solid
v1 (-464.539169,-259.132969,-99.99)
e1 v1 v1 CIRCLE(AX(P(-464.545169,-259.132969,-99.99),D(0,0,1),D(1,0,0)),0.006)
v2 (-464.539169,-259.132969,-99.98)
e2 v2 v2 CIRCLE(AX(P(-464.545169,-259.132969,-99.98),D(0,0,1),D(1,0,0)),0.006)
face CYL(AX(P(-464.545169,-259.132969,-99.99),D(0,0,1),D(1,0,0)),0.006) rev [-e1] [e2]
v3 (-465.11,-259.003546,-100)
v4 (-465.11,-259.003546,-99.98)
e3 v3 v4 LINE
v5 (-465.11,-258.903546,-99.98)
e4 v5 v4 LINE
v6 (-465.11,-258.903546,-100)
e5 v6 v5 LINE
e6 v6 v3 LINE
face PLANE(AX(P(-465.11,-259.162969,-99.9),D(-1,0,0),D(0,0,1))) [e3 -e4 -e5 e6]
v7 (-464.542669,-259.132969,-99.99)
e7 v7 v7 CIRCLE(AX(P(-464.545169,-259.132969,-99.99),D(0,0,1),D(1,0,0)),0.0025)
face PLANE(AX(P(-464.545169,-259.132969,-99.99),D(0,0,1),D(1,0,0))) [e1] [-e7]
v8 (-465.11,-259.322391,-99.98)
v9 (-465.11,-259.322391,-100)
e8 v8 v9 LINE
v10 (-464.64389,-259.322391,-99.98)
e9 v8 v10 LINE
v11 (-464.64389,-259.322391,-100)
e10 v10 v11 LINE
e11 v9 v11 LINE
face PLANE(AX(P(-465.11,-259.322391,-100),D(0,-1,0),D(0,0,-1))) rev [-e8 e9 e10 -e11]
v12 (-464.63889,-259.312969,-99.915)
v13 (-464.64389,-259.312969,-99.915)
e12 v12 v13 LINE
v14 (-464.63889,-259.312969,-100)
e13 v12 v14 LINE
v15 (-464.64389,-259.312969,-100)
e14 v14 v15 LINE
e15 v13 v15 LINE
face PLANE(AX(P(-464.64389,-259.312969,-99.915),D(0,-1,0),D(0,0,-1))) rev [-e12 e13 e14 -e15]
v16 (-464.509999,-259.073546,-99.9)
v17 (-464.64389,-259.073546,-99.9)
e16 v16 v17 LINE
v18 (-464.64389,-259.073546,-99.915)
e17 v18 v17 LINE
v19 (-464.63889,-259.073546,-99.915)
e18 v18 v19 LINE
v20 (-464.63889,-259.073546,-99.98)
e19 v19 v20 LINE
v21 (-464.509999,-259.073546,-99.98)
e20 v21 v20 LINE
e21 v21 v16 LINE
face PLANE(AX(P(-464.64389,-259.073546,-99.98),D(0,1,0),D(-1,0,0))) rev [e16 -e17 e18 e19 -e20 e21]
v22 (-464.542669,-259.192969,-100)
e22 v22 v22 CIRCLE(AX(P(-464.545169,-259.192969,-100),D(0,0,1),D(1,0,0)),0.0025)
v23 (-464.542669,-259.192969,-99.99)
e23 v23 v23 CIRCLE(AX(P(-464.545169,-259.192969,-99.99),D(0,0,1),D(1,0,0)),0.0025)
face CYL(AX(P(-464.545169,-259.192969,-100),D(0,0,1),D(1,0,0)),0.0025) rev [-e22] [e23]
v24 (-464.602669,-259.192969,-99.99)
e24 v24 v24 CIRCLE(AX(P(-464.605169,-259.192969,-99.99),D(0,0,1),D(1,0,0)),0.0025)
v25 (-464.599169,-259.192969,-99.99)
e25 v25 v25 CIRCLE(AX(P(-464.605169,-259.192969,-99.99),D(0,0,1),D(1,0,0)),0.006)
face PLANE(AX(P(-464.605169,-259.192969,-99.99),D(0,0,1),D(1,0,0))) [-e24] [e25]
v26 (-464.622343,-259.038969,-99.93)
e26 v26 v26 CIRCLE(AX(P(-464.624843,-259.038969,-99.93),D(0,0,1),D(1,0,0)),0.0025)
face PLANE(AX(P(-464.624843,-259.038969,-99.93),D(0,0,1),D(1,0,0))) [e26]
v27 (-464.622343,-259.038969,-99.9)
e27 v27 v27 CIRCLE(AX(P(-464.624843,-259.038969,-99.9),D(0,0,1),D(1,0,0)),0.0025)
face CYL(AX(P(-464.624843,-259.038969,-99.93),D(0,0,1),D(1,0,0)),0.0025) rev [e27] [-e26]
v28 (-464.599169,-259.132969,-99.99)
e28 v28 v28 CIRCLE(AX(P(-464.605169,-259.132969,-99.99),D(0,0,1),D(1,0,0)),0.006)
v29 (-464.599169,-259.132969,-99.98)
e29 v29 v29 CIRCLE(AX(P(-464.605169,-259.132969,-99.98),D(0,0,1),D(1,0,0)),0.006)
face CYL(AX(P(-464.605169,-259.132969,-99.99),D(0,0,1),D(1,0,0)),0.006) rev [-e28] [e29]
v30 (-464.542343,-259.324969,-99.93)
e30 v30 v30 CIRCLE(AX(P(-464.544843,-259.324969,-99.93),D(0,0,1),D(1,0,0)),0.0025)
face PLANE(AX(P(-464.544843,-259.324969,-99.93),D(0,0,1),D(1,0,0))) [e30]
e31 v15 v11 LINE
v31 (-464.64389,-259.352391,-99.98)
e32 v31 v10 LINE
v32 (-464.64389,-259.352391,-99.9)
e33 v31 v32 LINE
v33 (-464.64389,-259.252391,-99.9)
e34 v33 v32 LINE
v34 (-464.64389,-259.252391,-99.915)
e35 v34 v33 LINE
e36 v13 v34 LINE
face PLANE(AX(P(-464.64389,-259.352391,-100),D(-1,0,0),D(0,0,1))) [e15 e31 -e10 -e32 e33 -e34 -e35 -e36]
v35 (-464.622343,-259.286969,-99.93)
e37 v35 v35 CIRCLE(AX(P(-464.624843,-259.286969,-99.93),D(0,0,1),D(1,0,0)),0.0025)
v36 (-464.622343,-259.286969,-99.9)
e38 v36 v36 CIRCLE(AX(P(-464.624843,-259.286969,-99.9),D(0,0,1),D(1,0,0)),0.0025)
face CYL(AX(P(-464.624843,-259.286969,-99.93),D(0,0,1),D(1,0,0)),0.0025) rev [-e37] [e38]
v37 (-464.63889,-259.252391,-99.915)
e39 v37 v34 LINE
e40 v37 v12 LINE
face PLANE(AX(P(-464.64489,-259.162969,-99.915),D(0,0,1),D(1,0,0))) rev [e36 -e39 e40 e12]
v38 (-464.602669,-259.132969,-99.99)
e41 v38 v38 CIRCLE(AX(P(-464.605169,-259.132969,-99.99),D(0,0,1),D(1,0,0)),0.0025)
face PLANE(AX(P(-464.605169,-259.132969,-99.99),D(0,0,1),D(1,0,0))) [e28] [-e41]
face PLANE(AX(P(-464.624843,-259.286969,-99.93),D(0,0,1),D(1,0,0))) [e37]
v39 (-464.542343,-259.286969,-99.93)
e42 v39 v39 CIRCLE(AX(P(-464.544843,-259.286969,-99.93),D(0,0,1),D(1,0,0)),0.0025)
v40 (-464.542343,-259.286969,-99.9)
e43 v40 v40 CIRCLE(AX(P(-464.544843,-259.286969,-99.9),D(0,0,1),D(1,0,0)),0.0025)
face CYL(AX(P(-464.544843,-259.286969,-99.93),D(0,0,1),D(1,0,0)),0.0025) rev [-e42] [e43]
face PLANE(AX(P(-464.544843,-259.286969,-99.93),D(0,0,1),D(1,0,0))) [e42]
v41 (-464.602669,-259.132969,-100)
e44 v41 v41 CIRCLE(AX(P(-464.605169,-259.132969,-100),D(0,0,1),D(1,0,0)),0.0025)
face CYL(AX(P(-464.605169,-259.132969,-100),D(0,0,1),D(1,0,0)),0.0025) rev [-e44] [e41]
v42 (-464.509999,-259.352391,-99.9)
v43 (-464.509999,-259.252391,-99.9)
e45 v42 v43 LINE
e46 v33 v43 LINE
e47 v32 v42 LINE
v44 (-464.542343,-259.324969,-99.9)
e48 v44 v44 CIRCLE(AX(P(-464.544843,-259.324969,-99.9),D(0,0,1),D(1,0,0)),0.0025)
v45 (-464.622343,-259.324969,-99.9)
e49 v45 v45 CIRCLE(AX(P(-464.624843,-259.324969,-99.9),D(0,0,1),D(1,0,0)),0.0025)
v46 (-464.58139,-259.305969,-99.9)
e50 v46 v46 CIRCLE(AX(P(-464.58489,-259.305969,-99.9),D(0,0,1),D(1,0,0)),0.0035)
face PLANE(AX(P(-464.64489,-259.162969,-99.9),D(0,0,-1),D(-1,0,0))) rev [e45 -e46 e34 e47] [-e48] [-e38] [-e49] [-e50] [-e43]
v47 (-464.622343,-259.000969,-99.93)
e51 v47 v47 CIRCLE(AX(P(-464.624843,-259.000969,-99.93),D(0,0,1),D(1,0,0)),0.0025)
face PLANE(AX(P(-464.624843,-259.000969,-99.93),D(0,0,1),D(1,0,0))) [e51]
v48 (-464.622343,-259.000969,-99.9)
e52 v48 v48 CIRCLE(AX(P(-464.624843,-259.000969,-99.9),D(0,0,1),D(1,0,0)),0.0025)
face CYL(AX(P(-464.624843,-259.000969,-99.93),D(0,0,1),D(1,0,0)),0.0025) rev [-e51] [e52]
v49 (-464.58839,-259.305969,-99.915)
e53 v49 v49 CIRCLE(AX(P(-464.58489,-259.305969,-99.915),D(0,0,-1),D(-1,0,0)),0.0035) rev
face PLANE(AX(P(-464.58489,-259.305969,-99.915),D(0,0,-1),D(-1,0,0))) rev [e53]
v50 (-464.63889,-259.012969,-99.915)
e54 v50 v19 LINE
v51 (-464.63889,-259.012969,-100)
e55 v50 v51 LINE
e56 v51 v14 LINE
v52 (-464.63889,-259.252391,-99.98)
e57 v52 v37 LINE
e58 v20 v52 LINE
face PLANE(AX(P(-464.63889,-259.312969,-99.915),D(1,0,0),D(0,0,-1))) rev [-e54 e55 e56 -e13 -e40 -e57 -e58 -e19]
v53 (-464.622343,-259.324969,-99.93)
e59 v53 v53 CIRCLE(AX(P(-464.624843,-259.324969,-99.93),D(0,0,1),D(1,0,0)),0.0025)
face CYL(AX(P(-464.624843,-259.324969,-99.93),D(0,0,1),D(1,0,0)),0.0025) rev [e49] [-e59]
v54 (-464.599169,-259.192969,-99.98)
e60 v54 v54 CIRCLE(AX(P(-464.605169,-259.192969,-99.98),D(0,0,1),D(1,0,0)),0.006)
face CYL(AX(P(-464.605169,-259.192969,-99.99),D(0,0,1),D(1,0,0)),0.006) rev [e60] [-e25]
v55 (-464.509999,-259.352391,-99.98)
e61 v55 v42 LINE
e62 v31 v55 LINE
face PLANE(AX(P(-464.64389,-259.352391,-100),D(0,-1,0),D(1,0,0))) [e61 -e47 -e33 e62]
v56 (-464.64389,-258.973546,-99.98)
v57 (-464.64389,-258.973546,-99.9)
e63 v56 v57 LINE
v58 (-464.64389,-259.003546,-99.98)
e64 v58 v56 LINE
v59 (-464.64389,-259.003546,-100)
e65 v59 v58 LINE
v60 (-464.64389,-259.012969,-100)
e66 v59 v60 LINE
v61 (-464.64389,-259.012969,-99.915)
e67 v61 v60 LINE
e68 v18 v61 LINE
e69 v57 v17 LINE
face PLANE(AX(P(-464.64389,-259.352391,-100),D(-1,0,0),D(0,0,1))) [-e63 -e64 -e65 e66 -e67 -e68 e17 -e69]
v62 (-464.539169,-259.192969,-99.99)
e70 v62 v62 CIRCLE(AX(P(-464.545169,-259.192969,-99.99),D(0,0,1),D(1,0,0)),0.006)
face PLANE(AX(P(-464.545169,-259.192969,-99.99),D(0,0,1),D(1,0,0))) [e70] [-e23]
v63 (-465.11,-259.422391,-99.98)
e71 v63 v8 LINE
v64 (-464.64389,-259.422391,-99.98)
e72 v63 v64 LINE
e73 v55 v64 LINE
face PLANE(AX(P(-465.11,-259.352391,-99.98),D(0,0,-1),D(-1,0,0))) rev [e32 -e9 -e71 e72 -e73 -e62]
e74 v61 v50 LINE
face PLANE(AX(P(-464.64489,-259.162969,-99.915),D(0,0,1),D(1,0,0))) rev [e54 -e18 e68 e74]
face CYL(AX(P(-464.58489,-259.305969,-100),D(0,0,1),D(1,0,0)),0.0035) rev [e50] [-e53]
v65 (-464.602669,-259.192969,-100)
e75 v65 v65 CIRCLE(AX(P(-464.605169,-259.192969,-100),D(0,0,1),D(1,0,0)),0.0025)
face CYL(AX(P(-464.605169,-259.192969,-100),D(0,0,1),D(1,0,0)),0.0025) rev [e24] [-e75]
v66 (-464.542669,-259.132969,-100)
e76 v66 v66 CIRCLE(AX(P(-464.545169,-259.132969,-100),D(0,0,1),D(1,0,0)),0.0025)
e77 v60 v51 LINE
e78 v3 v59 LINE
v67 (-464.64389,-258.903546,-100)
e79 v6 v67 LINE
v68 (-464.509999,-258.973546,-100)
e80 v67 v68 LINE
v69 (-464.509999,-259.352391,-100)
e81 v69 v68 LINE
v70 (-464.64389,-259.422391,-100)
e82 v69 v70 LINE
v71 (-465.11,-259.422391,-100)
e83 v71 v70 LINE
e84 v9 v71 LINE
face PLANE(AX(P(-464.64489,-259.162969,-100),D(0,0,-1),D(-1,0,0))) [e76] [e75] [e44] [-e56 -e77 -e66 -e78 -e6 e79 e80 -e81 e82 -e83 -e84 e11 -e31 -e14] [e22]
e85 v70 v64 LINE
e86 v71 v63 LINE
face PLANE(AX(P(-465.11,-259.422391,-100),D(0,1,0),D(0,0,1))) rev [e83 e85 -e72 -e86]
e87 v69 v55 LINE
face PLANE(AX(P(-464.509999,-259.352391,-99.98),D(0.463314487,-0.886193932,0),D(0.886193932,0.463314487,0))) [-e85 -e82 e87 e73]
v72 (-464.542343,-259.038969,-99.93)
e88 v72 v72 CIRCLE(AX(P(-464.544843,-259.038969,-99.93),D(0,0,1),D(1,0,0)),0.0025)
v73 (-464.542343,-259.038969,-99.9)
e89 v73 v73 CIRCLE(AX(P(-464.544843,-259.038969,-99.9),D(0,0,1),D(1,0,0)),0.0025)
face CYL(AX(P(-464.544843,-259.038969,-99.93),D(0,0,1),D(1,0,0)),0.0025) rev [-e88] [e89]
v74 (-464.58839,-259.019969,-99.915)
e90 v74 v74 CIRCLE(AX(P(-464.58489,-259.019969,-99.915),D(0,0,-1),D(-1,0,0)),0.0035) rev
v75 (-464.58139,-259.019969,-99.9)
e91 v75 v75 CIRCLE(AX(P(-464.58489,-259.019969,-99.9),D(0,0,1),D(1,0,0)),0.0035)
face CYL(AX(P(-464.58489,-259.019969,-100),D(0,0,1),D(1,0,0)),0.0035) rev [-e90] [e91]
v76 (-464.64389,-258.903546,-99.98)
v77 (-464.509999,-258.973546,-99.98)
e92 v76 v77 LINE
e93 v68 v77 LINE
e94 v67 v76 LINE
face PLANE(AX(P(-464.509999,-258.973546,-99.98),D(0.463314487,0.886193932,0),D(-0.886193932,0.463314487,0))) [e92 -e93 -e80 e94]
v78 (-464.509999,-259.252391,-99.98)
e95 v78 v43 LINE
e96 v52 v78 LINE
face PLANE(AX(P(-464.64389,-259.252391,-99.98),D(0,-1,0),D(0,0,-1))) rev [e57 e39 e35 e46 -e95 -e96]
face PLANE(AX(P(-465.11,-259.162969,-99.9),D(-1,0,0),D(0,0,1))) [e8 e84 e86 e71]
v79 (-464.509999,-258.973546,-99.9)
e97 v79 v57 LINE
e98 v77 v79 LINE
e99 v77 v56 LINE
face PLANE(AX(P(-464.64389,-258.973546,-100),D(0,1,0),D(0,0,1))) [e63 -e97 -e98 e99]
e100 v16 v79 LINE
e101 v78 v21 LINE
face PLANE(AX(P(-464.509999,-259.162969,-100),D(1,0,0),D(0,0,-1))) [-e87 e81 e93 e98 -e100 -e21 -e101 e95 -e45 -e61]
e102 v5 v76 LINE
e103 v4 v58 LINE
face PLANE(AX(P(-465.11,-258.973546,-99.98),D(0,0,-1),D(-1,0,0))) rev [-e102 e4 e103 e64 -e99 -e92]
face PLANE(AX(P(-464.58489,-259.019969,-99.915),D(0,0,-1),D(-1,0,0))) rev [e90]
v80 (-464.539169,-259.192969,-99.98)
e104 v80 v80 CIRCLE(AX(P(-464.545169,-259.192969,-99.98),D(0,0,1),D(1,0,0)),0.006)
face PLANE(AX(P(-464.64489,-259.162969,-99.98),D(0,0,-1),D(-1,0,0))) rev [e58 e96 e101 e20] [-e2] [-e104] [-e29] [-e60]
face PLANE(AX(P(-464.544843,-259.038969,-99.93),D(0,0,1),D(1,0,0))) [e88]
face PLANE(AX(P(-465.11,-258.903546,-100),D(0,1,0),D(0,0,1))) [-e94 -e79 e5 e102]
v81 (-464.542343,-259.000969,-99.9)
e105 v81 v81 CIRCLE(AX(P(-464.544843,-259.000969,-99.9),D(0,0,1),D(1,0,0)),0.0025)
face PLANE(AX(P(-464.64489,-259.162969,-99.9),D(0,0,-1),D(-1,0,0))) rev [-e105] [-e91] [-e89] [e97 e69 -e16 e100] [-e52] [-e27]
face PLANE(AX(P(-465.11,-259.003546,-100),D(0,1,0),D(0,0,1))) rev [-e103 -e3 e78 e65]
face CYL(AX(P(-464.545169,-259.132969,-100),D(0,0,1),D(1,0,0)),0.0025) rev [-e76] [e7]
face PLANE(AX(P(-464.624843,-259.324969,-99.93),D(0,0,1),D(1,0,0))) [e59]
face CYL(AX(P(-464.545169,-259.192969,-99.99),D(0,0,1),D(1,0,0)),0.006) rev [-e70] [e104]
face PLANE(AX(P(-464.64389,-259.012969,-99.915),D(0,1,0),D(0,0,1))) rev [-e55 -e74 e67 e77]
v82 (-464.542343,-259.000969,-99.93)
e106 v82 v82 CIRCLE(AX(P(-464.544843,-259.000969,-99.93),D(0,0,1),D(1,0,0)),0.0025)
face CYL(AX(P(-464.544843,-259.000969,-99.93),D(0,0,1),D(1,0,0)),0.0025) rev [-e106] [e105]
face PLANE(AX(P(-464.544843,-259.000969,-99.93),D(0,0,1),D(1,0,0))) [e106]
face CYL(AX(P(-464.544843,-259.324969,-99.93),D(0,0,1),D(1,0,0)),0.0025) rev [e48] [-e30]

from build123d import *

# Parameters (mm, degrees)
SKETCH2_R            = 3.5
BOSS_EXTRUDE2_DEPTH  = 100
SKETCH4_W            = 133.89086021
SKETCH4_H            = 178.844782279
BOSS_EXTRUDE3_DEPTH  = 80
SKETCH4_2_W          = 133.89086021
SKETCH4_2_H          = 178.844782279
CUT_EXTRUDE1_DEPTH   = 80
SKETCH6_W            = 5
SKETCH6_H            = 300
CUT_EXTRUDE2_DEPTH   = 85
BOSS_EXTRUDE4_START  = -85
SKETCH9_R            = 3.5
BOSS_EXTRUDE4_DEPTH  = 85
SKETCH10_R           = 2.5
CUT_EXTRUDE14_DEPTH  = 30
SKETCH11_R           = 6
CUT_EXTRUDE15_DEPTH  = 10
SKETCH12_R           = 2.5
CUT_EXTRUDE16_DEPTH  = 10
BOSS_EXTRUDE5_DEPTH  = 466.11
BOSS_EXTRUDE6_DEPTH  = 20
BOSS_EXTRUDE7_DEPTH  = 466.11
BOSS_EXTRUDE8_DEPTH  = 20
SCALE2_START         = -100
SCALE2_OUTLINE_R     = 2.5
SCALE2_OUTLINE_R_2   = 0.0025
SCALE2_DEPTH         = 100
SCALE2_START_2       = -99.9
SCALE2_2_OUTLINE_R   = 0.0025
SCALE2_2_DEPTH       = 19.9
SCALE2_START_3       = -99.98
SCALE2_3_OUTLINE_W   = 0.12889086
SCALE2_3_OUTLINE_H   = 0.178844782
SCALE2_3_OUTLINE_R   = 0.0025
SCALE2_3_DEPTH       = 0.08
SCALE2_4_OUTLINE_W   = 0.005
SCALE2_4_OUTLINE_H   = 0.060577609
SCALE2_4_DEPTH       = 0.085
SCALE2_START_4       = -99.93
SCALE2_5_OUTLINE_R   = 0.0025
SCALE2_5_DEPTH       = 0.03
SCALE2_START_5       = -99.99
SCALE2_6_OUTLINE_R   = 0.006
SCALE2_6_OUTLINE_R_2 = 0.0025
SCALE2_6_DEPTH       = 0.01
SCALE2_START_6       = -99.915
SCALE2_7_OUTLINE_R   = 0.0035
SCALE2_7_DEPTH       = 0.015


# Read off the part's stored shape, not the designer's step: Scale2
with BuildPart() as part:
    # Sketch2 → Boss-Extrude2 (new body)
    with BuildSketch(Plane.XY):
        Polygon((1.000000002, -189.42239114), (1.000000002, 189.422391139), (134.890860212, 189.422391139), (134.890860212, 1.4e-08), (134.890860212, -189.42239114), align=None)
        with Locations((60, -143)):
            Circle(SKETCH2_R, mode=Mode.SUBTRACT)
        with Locations((60, 143)):
            Circle(SKETCH2_R, mode=Mode.SUBTRACT)
    extrude(amount=-BOSS_EXTRUDE2_DEPTH)

    # Sketch4 → Boss-Extrude3 (add)
    with BuildSketch(Plane.XY):
        with Locations((67.945430107, 0)):
            Rectangle(SKETCH4_W, SKETCH4_H)
    extrude(amount=-BOSS_EXTRUDE3_DEPTH)

    # Sketch4<2> → Cut-Extrude1 (cut)
    with BuildSketch(Plane.XY):
        with Locations((67.945430107, 0)):
            Rectangle(SKETCH4_2_W, SKETCH4_2_H)
    extrude(amount=-CUT_EXTRUDE1_DEPTH, mode=Mode.SUBTRACT)

    # Sketch6 → Cut-Extrude2 (cut)
    with BuildSketch(Plane(origin=(0, 0, -100), x_dir=(-1, 0, 0), z_dir=(0, 0, -1))):
        with Locations((-3.500000002, 0)):
            Rectangle(SKETCH6_W, SKETCH6_H)
    extrude(amount=-CUT_EXTRUDE2_DEPTH, mode=Mode.SUBTRACT)

    # Sketch9 → Boss-Extrude4 (add)
    with BuildSketch(Plane(origin=(0, 0, -100), x_dir=(-1, 0, 0), z_dir=(0, 0, -1)).offset(BOSS_EXTRUDE4_START)):
        with Locations(Location((-60, 143, 0), (0, 0, 180))):
            Circle(SKETCH9_R)
        with Locations(Location((-60, -143, 0), (0, 0, 180))):
            Circle(SKETCH9_R)
    extrude(amount=BOSS_EXTRUDE4_DEPTH)

    # Sketch10 → Cut-Extrude14 (cut)
    with BuildSketch(Plane.XY):
        with Locations((20.046580004, -162)):
            Circle(SKETCH10_R)
        with Locations((20.046580004, -124)):
            Circle(SKETCH10_R)
        with Locations((100.046580004, -124)):
            Circle(SKETCH10_R)
        with Locations((100.046580004, -162)):
            Circle(SKETCH10_R)
        with Locations((20.046580004, 124)):
            Circle(SKETCH10_R)
        with Locations((20.046580004, 162)):
            Circle(SKETCH10_R)
        with Locations((100.046580004, 162)):
            Circle(SKETCH10_R)
        with Locations((100.046580004, 124)):
            Circle(SKETCH10_R)
    extrude(amount=-CUT_EXTRUDE14_DEPTH, mode=Mode.SUBTRACT)

    # Sketch11 → Cut-Extrude15 (cut)
    with BuildSketch(Plane.XY.offset(-80)):
        with Locations((39.720690002, -30.000000885)):
            Circle(SKETCH11_R)
        with Locations((99.720690002, -30.000000885)):
            Circle(SKETCH11_R)
        with Locations((99.720690002, 29.999999115)):
            Circle(SKETCH11_R)
        with Locations((39.720690002, 29.999999115)):
            Circle(SKETCH11_R)
    extrude(amount=-CUT_EXTRUDE15_DEPTH, mode=Mode.SUBTRACT)

    # Sketch12 → Cut-Extrude16 (cut)
    with BuildSketch(Plane.XY.offset(-90)):
        with Locations((99.720690002, -30.000000885)):
            Circle(SKETCH12_R)
        with Locations((39.720690002, -30.000000885)):
            Circle(SKETCH12_R)
        with Locations((39.720690002, 29.999999115)):
            Circle(SKETCH12_R)
        with Locations((99.720690002, 29.999999115)):
            Circle(SKETCH12_R)
    extrude(amount=-CUT_EXTRUDE16_DEPTH, mode=Mode.SUBTRACT)

    # Sketch13 → Boss-Extrude5 (add)
    with BuildSketch(Plane.ZY.offset(-1.000000002)):
        Polygon((-100, 189.422391139), (-100, 159.422391139), (-80, 159.422391139), (-80, 189.422391139), (-80, 259.422391139), (-100, 259.422391139), align=None)
    extrude(amount=BOSS_EXTRUDE5_DEPTH)

    # Sketch14 → Boss-Extrude6 (add)
    with BuildSketch(Plane(origin=(0, 0, -100), x_dir=(-1, 0, 0), z_dir=(0, 0, -1))):
        Polygon((-134.890860212, 189.422391139), (-1.000000002, 259.422391139), (-1.000000002, 189.422391139), align=None)
    extrude(amount=-BOSS_EXTRUDE6_DEPTH)

    # Sketch15 → Boss-Extrude7 (add)
    with BuildSketch(Plane.ZY.offset(-1.000000002)):
        Polygon((-100, -189.42239114), (-100, -159.42239114), (-80, -159.42239114), (-80, -189.42239114), (-80, -259.42239114), (-100, -259.42239114), align=None)
    extrude(amount=BOSS_EXTRUDE7_DEPTH)

    # Sketch16 → Boss-Extrude8 (add)
    with BuildSketch(Plane(origin=(0, 0, -100), x_dir=(-1, 0, 0), z_dir=(0, 0, -1))):
        Polygon((-134.890860212, -189.42239114), (-1.000000002, -259.42239114), (-1.000000002, -189.42239114), align=None)
    extrude(amount=-BOSS_EXTRUDE8_DEPTH)

    # Scale2 outline → Scale2 (cut)
    # profile 1 of 6: a face of its own
    with BuildSketch(Plane.XY.offset(SCALE2_START)):
        Polygon((-464.643889998, -259.32239114), (-464.643889998, -259.25239114), (-464.638889998, -259.25239114), (-464.638889998, -259.073546358), (-464.643889998, -259.073546358), (-464.643889998, -259.003546358), (-465.109999998, -259.003546358), (-465.109999998, -259.32239114), align=None)
    # profile 2 of 6: a face of its own
    with BuildSketch(Plane.XY.offset(SCALE2_START)):
        Polygon((-464.509999138, -259.35239114), (-464.643889998, -259.42239114), (1.000000002, -259.42239114), (134.890860212, -189.42239114), (134.890860212, 189.422391139), (1.000000002, 259.422391139), (-465.109999998, 259.422391139), (-465.109999998, 159.422391139), (1.000000002, 159.422391139), (1.000000002, 89.422391139), (6.000000002, 89.422391139), (6.000000002, -89.42239114), (1.000000002, -89.42239114), (1.000000002, -159.42239114), (-465.109999998, -159.42239114), (-465.109999998, -258.903546358), (-464.643889998, -258.903546358), (-464.509999138, -258.973546358), align=None)
        with Locations((99.720690002, 29.999999115)):
            Circle(SCALE2_OUTLINE_R, mode=Mode.SUBTRACT)
        with Locations((39.720690002, -30.000000885)):
            Circle(SCALE2_OUTLINE_R, mode=Mode.SUBTRACT)
        with Locations((99.720690002, -30.000000885)):
            Circle(SCALE2_OUTLINE_R, mode=Mode.SUBTRACT)
        with Locations((39.720690002, 29.999999115)):
            Circle(SCALE2_OUTLINE_R, mode=Mode.SUBTRACT)
    # profile 3 of 6: a face of its own
    with BuildSketch(Plane.XY.offset(SCALE2_START)):
        with Locations((-464.545169308, -259.19296875)):
            Circle(SCALE2_OUTLINE_R_2)
    # profile 4 of 6: a face of its own
    with BuildSketch(Plane.XY.offset(SCALE2_START)):
        with Locations((-464.605169308, -259.19296875)):
            Circle(SCALE2_OUTLINE_R_2)
    # profile 5 of 6: a face of its own
    with BuildSketch(Plane.XY.offset(SCALE2_START)):
        with Locations((-464.605169308, -259.13296875)):
            Circle(SCALE2_OUTLINE_R_2)
    # profile 6 of 6: a face of its own
    with BuildSketch(Plane.XY.offset(SCALE2_START)):
        with Locations((-464.545169308, -259.13296875)):
            Circle(SCALE2_OUTLINE_R_2)
    extrude(amount=SCALE2_DEPTH, mode=Mode.SUBTRACT)

    # Scale2 2 outline → Scale2 2 (cut)
    with BuildSketch(Plane.XY.offset(SCALE2_START_2)):
        Polygon((-464.638889998, -259.25239114), (-464.643889998, -259.25239114), (-464.643889998, -259.32239114), (-465.109999998, -259.32239114), (-465.109999998, -259.42239114), (-464.643889998, -259.42239114), (-464.509999138, -259.35239114), (-464.509999138, -258.973546358), (-464.643889998, -258.903546358), (-465.109999998, -258.903546358), (-465.109999998, -259.003546358), (-464.643889998, -259.003546358), (-464.643889998, -259.073546358), (-464.638889998, -259.073546358), align=None)
        with Locations((-464.605169308, -259.13296875)):
            Circle(SCALE2_2_OUTLINE_R, mode=Mode.SUBTRACT)
        with Locations((-464.605169308, -259.19296875)):
            Circle(SCALE2_2_OUTLINE_R, mode=Mode.SUBTRACT)
        with Locations((-464.545169308, -259.19296875)):
            Circle(SCALE2_2_OUTLINE_R, mode=Mode.SUBTRACT)
        with Locations((-464.545169308, -259.13296875)):
            Circle(SCALE2_2_OUTLINE_R, mode=Mode.SUBTRACT)
    extrude(amount=SCALE2_2_DEPTH, mode=Mode.SUBTRACT)

    # Scale2 3 outline → Scale2 3 (cut)
    # profile 1 of 3: a face of its own
    with BuildSketch(Plane.XY.offset(SCALE2_START_3)):
        with Locations((-464.574444568, -259.162968749)):
            Rectangle(SCALE2_3_OUTLINE_W, SCALE2_3_OUTLINE_H)
        with Locations((-464.605169308, -259.19296875)):
            Circle(SCALE2_3_OUTLINE_R, mode=Mode.SUBTRACT)
        with Locations((-464.545169308, -259.19296875)):
            Circle(SCALE2_3_OUTLINE_R, mode=Mode.SUBTRACT)
        with Locations((-464.545169308, -259.13296875)):
            Circle(SCALE2_3_OUTLINE_R, mode=Mode.SUBTRACT)
        with Locations((-464.605169308, -259.13296875)):
            Circle(SCALE2_3_OUTLINE_R, mode=Mode.SUBTRACT)
    # profile 2 of 3: a face of its own
    with BuildSketch(Plane.XY.offset(SCALE2_START_3)):
        Polygon((-464.643889998, -259.35239114), (-464.643889998, -259.32239114), (-465.109999998, -259.32239114), (-465.109999998, -259.42239114), (-464.643889998, -259.42239114), (-464.509999138, -259.35239114), align=None)
    # profile 3 of 3: a face of its own
    with BuildSketch(Plane.XY.offset(SCALE2_START_3)):
        Polygon((-465.109999998, -258.903546358), (-465.109999998, -259.003546358), (-464.643889998, -259.003546358), (-464.643889998, -258.973546358), (-464.509999138, -258.973546358), (-464.643889998, -258.903546358), align=None)
    extrude(amount=SCALE2_3_DEPTH, mode=Mode.SUBTRACT)

    # Scale2 4 outline → Scale2 4 (cut)
    with BuildSketch(Plane.XY.offset(SCALE2_START)):
        with Locations((-464.641389998, -259.282679945)):
            Rectangle(SCALE2_4_OUTLINE_W, SCALE2_4_OUTLINE_H)
        with Locations((-464.641389998, -259.043257554)):
            Rectangle(SCALE2_4_OUTLINE_W, SCALE2_4_OUTLINE_H)
    extrude(amount=SCALE2_4_DEPTH, mode=Mode.SUBTRACT)

    # Scale2 5 outline → Scale2 5 (cut)
    with BuildSketch(Plane.XY.offset(SCALE2_START_4)):
        with Locations((-464.624843418, -259.324968749)):
            Circle(SCALE2_5_OUTLINE_R)
        with Locations((-464.624843418, -259.286968749)):
            Circle(SCALE2_5_OUTLINE_R)
        with Locations((-464.544843418, -259.286968749)):
            Circle(SCALE2_5_OUTLINE_R)
        with Locations((-464.544843418, -259.324968749)):
            Circle(SCALE2_5_OUTLINE_R)
        with Locations((-464.624843418, -259.038968749)):
            Circle(SCALE2_5_OUTLINE_R)
        with Locations((-464.624843418, -259.000968749)):
            Circle(SCALE2_5_OUTLINE_R)
        with Locations((-464.544843418, -259.000968749)):
            Circle(SCALE2_5_OUTLINE_R)
        with Locations((-464.544843418, -259.038968749)):
            Circle(SCALE2_5_OUTLINE_R)
    extrude(amount=SCALE2_5_DEPTH, mode=Mode.SUBTRACT)

    # Scale2 6 outline → Scale2 6 (cut)
    # profile 1 of 4: a face of its own
    with BuildSketch(Plane.XY.offset(SCALE2_START_5)):
        with Locations((-464.605169308, -259.19296875)):
            Circle(SCALE2_6_OUTLINE_R)
        with Locations((-464.605169308, -259.19296875)):
            Circle(SCALE2_6_OUTLINE_R_2, mode=Mode.SUBTRACT)
    # profile 2 of 4: a face of its own
    with BuildSketch(Plane.XY.offset(SCALE2_START_5)):
        with Locations((-464.545169308, -259.19296875)):
            Circle(SCALE2_6_OUTLINE_R)
        with Locations((-464.545169308, -259.19296875)):
            Circle(SCALE2_6_OUTLINE_R_2, mode=Mode.SUBTRACT)
    # profile 3 of 4: a face of its own
    with BuildSketch(Plane.XY.offset(SCALE2_START_5)):
        with Locations((-464.545169308, -259.13296875)):
            Circle(SCALE2_6_OUTLINE_R)
        with Locations((-464.545169308, -259.13296875)):
            Circle(SCALE2_6_OUTLINE_R_2, mode=Mode.SUBTRACT)
    # profile 4 of 4: a face of its own
    with BuildSketch(Plane.XY.offset(SCALE2_START_5)):
        with Locations((-464.605169308, -259.13296875)):
            Circle(SCALE2_6_OUTLINE_R)
        with Locations((-464.605169308, -259.13296875)):
            Circle(SCALE2_6_OUTLINE_R_2, mode=Mode.SUBTRACT)
    extrude(amount=SCALE2_6_DEPTH, mode=Mode.SUBTRACT)

    # Scale2 7 outline → Scale2 7 (cut)
    with BuildSketch(Plane.XY.offset(SCALE2_START_6)):
        with Locations((-464.584889998, -259.305968749)):
            Circle(SCALE2_7_OUTLINE_R)
        with Locations((-464.584889998, -259.019968749)):
            Circle(SCALE2_7_OUTLINE_R)
    extrude(amount=SCALE2_7_DEPTH, mode=Mode.SUBTRACT)


solid = part.part
